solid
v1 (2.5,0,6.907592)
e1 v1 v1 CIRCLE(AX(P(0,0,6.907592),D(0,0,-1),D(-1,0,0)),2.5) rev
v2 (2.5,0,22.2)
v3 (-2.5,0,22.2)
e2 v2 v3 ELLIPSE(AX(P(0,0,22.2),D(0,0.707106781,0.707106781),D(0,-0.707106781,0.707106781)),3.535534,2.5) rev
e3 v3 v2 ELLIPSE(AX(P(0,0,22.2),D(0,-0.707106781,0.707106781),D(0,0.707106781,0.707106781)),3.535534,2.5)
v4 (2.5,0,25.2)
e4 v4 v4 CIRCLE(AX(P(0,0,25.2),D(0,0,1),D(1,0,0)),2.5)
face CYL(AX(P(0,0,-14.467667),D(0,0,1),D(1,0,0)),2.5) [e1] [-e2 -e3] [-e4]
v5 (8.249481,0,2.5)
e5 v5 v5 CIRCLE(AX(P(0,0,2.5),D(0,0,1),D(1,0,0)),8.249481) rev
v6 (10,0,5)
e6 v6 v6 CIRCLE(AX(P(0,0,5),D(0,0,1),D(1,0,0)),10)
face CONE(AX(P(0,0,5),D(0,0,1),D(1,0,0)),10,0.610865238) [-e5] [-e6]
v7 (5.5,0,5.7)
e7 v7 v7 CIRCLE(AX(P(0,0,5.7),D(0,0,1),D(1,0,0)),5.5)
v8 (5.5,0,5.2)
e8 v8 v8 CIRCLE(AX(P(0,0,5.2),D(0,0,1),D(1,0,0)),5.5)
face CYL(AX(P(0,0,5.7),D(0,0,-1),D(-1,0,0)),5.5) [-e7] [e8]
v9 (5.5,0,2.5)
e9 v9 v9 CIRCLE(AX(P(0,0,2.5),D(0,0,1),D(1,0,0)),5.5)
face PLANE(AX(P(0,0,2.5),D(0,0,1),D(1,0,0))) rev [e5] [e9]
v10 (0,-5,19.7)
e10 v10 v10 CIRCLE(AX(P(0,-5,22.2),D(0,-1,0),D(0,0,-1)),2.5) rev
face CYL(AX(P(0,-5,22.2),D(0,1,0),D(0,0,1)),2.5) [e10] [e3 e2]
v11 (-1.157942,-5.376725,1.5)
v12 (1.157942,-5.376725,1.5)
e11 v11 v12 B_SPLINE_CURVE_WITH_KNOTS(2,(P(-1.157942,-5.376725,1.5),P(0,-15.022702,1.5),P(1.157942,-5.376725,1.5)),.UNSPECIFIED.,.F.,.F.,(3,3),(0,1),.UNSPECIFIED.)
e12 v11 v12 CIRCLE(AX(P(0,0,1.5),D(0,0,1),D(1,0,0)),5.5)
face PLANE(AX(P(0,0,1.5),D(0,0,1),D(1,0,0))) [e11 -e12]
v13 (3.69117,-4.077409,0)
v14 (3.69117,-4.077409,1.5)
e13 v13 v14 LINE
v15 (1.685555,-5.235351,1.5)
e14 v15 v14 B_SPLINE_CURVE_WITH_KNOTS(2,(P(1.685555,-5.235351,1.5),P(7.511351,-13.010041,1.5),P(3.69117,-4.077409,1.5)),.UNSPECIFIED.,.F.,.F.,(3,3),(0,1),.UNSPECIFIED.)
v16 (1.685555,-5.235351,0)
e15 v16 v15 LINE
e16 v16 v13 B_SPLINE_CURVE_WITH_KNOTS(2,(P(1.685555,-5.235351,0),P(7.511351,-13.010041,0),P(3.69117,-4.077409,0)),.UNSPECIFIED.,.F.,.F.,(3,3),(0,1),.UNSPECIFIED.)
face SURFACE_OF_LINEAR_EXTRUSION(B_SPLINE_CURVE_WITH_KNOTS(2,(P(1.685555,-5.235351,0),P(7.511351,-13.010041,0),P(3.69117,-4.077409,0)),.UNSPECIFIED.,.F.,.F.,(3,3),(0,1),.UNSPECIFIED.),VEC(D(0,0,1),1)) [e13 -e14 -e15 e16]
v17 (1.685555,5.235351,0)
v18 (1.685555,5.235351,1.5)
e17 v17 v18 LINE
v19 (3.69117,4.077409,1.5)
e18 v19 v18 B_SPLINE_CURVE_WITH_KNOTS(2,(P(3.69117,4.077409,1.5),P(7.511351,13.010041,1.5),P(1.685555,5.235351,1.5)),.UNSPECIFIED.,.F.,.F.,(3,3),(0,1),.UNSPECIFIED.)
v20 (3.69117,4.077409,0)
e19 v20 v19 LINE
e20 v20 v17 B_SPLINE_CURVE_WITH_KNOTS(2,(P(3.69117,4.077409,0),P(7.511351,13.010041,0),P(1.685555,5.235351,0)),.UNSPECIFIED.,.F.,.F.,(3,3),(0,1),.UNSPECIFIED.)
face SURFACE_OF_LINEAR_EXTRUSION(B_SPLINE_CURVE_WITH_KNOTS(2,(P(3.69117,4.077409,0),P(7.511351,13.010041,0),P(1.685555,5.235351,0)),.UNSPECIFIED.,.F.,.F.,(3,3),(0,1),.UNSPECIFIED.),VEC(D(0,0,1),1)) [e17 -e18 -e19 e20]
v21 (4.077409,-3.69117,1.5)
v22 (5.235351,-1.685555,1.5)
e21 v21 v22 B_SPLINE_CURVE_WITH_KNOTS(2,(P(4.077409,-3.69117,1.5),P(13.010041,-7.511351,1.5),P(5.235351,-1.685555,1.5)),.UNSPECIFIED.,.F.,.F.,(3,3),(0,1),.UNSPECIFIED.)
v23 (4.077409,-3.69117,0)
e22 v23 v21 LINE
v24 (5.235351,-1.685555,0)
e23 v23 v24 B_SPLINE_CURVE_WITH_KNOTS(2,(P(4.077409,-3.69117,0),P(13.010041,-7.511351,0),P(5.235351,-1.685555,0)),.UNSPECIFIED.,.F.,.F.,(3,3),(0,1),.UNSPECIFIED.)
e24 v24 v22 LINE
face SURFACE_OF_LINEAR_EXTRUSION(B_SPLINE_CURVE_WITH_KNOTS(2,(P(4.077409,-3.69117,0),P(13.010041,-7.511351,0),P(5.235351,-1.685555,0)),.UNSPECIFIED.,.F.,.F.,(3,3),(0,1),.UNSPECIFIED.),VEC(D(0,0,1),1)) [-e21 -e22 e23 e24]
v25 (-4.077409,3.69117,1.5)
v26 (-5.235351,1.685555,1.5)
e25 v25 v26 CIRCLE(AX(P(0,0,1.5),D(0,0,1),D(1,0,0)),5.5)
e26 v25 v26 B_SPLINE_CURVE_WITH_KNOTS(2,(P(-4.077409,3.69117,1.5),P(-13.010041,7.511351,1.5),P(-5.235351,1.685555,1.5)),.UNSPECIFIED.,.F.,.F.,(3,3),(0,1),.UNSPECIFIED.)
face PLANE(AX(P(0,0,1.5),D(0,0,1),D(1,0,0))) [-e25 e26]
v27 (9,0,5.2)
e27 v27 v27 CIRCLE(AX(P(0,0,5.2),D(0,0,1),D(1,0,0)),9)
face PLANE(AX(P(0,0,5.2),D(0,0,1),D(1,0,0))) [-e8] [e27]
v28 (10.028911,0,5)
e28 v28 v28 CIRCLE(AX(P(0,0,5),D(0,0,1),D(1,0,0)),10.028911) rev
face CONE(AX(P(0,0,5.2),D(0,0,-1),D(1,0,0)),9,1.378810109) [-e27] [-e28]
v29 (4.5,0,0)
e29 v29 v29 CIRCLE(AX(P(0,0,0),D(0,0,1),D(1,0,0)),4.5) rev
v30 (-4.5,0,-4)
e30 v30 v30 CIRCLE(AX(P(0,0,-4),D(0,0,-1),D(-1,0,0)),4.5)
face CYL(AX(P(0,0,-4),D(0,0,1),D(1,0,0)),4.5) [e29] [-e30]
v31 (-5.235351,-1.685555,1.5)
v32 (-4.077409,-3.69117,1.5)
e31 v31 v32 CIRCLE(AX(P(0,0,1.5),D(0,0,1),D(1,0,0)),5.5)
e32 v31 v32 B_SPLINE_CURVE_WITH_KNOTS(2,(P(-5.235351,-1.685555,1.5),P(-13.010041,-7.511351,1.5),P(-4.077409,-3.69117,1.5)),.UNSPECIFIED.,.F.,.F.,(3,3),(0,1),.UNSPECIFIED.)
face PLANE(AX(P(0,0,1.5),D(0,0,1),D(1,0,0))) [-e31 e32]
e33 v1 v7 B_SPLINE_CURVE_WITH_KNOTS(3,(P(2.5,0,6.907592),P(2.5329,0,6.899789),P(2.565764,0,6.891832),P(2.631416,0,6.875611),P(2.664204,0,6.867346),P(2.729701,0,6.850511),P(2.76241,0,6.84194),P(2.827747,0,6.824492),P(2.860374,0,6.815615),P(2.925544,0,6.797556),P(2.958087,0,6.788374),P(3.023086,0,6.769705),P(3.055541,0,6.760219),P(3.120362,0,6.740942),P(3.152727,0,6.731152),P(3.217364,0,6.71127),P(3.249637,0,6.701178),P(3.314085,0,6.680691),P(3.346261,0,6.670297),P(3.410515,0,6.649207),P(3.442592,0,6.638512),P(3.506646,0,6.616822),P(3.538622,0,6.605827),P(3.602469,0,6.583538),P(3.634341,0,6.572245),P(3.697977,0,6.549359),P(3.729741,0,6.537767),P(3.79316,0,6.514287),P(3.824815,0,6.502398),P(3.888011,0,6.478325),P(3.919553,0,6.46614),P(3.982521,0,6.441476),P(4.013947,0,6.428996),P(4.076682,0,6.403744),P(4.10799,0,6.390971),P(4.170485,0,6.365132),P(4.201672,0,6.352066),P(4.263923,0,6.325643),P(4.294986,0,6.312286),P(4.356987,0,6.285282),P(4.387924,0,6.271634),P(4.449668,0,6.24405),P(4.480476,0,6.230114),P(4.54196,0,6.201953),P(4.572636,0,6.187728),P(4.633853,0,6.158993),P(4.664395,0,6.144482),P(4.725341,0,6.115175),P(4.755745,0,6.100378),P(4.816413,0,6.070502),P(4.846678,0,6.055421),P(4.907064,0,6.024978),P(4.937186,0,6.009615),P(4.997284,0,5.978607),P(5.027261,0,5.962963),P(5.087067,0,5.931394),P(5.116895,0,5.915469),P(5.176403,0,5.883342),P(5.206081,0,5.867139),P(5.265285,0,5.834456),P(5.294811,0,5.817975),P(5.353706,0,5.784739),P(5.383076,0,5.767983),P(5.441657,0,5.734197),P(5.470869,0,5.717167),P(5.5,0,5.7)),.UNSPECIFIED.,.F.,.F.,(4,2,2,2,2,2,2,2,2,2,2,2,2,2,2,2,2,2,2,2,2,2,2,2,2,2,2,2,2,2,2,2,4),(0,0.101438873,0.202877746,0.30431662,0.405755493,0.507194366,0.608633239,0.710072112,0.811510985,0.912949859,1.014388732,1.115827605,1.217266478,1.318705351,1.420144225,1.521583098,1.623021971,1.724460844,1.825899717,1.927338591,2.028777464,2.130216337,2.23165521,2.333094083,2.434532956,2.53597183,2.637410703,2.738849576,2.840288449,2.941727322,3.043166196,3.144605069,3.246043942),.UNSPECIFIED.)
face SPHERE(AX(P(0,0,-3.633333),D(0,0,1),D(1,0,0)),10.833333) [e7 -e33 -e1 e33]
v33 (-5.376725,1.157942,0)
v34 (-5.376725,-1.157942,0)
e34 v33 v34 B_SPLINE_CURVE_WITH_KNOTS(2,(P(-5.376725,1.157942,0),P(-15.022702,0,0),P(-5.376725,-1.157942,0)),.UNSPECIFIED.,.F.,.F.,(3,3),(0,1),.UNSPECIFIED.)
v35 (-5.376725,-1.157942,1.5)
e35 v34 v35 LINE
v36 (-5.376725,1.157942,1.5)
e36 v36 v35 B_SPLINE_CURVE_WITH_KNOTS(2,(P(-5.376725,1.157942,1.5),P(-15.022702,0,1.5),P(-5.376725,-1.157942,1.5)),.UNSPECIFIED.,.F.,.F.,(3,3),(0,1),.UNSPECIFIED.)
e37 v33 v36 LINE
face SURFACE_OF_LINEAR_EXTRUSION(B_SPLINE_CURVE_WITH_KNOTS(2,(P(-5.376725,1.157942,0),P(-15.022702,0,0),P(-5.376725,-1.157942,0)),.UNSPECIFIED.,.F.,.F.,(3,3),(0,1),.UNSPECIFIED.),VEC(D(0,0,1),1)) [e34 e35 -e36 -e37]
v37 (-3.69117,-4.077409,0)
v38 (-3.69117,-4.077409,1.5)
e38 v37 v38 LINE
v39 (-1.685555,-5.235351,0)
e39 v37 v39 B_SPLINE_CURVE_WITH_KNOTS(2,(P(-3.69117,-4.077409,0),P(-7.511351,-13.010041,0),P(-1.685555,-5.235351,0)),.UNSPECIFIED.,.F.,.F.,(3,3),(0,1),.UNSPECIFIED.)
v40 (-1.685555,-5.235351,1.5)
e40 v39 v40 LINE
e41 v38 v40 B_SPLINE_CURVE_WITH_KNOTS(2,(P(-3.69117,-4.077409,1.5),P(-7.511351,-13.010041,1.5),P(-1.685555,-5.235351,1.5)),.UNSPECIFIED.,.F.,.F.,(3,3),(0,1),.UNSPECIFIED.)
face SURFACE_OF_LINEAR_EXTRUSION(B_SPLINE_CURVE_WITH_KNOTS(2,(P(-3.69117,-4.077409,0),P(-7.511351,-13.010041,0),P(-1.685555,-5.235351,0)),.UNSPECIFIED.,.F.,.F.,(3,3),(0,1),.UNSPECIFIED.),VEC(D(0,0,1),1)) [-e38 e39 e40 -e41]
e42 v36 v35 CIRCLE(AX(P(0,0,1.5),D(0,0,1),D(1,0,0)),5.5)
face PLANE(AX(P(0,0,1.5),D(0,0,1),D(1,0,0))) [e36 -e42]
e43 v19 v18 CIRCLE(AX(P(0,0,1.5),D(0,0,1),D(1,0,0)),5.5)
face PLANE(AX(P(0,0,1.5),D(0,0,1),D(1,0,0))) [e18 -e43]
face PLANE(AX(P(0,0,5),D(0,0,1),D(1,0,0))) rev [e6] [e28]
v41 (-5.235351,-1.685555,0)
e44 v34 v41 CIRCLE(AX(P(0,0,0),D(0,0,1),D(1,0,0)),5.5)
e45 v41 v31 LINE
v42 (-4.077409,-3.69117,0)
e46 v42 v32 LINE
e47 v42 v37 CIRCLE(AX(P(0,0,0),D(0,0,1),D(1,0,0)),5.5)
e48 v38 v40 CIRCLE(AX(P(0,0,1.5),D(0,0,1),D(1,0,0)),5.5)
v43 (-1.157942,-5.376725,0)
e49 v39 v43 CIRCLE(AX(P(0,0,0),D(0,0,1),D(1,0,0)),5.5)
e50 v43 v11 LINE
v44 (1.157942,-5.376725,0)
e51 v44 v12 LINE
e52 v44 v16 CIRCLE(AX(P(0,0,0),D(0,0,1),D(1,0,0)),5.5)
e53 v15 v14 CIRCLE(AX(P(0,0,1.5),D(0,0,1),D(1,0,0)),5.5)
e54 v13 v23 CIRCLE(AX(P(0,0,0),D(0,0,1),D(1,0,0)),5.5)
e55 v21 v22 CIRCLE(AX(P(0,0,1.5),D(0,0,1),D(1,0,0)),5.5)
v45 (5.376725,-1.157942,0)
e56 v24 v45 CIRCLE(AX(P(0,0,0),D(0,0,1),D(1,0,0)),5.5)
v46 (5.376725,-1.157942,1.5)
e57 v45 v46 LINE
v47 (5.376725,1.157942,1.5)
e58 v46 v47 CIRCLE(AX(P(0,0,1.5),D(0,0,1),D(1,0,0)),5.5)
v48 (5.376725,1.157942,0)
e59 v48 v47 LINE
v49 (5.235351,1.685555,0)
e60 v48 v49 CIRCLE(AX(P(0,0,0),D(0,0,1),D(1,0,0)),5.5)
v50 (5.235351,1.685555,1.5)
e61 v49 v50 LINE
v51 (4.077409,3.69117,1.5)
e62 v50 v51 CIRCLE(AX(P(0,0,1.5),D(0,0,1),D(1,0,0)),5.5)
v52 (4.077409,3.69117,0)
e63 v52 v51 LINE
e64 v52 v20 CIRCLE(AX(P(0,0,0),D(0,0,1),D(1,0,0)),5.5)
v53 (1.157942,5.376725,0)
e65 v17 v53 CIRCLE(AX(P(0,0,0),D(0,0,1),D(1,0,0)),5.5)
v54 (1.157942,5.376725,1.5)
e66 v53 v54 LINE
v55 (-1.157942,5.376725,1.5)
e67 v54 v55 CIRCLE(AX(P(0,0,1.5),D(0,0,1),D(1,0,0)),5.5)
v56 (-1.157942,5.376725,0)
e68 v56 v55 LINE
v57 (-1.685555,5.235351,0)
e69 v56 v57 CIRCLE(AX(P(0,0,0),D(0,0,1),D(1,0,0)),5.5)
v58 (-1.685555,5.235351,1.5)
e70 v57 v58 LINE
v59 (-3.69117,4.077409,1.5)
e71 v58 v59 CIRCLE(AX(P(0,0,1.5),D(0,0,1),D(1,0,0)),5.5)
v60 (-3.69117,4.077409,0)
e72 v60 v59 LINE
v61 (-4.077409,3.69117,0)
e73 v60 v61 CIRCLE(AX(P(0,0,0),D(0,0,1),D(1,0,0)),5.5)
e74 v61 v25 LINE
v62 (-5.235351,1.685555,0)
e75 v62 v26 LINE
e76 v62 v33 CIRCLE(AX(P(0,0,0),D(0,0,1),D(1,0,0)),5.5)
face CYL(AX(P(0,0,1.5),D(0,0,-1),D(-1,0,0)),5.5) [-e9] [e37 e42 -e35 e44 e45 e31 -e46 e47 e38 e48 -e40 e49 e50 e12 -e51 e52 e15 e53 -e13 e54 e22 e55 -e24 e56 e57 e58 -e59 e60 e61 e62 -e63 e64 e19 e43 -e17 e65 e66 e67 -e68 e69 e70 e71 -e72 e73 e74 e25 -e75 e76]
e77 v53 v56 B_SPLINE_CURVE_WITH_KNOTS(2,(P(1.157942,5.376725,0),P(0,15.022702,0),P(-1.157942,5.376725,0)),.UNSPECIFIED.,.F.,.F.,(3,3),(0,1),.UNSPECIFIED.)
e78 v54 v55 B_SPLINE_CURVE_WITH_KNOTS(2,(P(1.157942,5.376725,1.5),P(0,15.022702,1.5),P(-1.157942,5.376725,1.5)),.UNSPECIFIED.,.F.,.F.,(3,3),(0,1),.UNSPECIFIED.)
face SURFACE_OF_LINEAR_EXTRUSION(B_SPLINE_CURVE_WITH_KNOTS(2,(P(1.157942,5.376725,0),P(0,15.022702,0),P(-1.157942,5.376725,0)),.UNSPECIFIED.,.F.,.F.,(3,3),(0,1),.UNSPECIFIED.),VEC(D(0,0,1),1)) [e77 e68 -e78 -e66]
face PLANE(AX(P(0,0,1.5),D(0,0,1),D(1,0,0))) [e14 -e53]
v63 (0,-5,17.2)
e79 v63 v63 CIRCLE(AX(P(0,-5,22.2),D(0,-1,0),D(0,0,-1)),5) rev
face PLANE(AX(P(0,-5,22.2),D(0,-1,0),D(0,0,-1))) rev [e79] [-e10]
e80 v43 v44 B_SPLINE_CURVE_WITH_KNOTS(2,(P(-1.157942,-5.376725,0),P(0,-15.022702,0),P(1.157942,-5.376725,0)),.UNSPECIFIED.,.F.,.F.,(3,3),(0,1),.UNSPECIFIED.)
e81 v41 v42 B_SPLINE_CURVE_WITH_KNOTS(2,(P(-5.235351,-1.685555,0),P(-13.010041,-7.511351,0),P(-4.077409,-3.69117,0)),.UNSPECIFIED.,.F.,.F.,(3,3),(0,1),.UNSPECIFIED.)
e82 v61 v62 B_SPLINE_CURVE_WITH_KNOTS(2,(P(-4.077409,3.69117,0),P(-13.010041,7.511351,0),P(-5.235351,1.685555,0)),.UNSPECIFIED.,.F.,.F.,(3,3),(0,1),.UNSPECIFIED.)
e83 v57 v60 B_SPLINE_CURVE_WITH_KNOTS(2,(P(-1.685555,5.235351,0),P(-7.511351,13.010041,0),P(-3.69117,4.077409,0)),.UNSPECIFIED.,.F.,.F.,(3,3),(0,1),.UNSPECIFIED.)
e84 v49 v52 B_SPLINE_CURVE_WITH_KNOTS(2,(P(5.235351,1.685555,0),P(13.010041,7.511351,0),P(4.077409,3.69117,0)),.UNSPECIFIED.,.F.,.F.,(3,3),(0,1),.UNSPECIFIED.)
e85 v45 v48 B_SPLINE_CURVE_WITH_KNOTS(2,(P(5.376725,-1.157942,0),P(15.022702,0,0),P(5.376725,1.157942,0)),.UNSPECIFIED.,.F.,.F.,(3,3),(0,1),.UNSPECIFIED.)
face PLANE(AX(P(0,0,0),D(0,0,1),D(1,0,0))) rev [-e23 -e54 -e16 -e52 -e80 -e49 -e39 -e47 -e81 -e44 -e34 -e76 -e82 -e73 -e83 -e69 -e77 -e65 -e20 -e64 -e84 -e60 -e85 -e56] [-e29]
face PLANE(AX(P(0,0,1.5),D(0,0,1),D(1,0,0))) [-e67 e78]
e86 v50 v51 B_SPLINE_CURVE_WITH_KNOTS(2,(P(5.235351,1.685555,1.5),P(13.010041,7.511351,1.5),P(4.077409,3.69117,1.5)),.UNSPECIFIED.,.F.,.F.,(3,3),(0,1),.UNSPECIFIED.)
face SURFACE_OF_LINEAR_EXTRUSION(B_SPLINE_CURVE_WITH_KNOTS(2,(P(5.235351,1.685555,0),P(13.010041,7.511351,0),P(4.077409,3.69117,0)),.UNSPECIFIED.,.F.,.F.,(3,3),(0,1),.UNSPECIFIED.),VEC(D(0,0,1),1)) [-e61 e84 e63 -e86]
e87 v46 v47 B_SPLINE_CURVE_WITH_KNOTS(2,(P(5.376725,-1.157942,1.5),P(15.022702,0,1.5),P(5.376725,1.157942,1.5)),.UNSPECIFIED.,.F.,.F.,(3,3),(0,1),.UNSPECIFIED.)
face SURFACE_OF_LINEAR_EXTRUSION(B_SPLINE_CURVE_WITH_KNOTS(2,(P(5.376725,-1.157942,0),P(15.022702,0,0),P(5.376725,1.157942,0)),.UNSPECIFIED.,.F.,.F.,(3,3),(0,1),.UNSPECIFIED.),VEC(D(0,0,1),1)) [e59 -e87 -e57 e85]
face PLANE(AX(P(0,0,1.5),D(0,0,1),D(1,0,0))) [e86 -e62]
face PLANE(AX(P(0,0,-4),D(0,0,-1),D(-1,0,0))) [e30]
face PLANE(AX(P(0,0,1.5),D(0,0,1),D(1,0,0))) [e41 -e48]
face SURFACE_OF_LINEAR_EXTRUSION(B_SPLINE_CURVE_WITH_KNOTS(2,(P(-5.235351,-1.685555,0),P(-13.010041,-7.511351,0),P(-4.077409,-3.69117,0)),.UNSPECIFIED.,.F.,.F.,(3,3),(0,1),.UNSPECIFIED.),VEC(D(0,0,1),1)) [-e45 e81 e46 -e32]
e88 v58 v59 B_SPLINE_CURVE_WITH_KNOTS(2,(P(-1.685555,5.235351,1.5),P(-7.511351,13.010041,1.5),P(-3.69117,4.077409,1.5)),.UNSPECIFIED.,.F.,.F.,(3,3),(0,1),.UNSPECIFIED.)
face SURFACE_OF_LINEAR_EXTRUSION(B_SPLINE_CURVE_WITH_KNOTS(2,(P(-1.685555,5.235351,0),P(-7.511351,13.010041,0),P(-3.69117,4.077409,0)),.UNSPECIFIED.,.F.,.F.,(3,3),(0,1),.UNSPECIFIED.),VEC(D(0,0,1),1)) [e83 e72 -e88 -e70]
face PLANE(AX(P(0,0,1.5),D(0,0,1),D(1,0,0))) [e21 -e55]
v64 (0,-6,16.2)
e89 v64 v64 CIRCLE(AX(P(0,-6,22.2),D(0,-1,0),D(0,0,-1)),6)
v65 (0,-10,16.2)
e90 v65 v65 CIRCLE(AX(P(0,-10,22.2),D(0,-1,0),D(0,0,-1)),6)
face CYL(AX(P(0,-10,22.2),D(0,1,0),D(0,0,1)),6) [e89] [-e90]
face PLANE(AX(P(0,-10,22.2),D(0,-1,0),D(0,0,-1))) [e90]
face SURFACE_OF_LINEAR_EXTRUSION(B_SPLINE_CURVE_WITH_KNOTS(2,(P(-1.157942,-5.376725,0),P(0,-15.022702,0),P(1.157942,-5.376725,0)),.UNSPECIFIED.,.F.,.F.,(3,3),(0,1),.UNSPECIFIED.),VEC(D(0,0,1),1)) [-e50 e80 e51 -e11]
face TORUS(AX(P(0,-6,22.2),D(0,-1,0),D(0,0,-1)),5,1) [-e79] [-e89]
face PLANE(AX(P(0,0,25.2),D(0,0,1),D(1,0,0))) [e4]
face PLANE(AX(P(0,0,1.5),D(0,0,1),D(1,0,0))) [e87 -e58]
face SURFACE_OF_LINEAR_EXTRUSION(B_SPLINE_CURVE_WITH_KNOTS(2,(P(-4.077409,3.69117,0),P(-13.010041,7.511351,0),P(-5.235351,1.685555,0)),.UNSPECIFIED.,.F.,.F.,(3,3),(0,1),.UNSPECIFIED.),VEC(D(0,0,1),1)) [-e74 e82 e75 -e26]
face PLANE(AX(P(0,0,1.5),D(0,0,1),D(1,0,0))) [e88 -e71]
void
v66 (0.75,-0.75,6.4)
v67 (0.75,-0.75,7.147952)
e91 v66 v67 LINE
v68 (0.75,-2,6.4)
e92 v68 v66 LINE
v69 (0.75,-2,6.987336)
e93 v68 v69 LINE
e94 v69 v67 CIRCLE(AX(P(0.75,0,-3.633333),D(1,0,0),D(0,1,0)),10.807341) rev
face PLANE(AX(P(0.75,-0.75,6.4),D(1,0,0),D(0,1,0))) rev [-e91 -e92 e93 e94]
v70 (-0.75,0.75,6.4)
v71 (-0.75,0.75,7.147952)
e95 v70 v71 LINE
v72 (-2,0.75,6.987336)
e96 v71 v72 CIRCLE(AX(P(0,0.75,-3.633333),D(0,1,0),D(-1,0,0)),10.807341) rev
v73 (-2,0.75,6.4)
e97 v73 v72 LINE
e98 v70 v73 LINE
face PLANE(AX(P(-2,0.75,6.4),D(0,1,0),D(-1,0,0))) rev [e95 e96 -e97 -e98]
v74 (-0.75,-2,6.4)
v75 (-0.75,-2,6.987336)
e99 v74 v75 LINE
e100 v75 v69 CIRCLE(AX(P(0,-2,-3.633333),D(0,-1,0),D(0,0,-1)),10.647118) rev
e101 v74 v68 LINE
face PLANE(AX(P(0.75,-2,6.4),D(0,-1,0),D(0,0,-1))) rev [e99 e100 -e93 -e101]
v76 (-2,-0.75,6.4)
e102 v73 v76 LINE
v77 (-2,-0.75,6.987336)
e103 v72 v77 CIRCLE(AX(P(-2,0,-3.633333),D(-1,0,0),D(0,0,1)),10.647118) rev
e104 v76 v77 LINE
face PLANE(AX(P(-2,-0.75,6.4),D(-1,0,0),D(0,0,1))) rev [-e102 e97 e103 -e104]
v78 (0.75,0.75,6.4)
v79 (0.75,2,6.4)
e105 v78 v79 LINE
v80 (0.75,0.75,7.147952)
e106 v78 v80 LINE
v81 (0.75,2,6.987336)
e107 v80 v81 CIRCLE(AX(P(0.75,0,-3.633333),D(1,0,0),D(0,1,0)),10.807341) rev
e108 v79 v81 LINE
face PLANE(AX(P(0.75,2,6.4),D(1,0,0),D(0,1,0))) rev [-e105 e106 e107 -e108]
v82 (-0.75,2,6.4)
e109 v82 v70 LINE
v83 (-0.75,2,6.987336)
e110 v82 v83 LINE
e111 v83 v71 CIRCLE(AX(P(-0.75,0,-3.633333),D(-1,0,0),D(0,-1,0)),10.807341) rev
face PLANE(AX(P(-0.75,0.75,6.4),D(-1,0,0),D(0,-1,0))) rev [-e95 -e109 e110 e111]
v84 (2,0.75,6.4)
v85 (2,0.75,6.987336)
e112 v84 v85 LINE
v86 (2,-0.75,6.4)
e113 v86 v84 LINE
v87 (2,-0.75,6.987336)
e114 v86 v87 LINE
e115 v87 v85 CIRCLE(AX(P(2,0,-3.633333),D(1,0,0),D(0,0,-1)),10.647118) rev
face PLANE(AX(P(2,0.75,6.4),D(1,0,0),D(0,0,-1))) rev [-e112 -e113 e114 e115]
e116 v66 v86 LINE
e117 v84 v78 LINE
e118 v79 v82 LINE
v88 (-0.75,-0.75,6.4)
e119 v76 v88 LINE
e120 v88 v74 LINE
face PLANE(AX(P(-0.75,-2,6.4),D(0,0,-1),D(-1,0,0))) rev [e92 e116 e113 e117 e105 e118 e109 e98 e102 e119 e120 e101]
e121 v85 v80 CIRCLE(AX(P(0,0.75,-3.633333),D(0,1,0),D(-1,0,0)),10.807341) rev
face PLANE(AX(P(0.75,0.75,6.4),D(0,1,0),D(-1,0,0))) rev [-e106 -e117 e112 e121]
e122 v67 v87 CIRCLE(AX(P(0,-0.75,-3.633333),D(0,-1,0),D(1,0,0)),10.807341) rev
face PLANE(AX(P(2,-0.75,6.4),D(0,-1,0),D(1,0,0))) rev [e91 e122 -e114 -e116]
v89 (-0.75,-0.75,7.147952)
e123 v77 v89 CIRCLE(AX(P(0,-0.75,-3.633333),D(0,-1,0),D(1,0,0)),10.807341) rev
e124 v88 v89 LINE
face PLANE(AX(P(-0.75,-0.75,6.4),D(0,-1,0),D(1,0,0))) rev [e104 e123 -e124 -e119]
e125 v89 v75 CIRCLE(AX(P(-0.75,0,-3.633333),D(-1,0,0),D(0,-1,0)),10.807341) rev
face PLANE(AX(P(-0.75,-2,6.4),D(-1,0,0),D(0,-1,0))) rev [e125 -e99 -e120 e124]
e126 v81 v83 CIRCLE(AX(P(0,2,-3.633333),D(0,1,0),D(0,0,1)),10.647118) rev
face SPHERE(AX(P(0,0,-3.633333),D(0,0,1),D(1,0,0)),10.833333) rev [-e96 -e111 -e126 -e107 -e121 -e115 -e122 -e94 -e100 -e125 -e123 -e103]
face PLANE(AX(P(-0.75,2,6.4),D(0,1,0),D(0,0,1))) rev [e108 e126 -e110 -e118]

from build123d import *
from build123d.topology import SkipClean

# Parameters (mm, degrees)
SKETCH1_R                = 5.5
GEARPLATE_DEPTH          = 1.5
BOSS_EXTRUDE3_DEPTH      = 1.5
CIRPATTERN2_COUNT        = 12
SKETCH3_R                = 4.5
BACKPLATE_DEPTH          = 4
SKETCH4_R                = 5.5
PLATE_DEPTH              = 1
SKETCH6_R                = 10
ANGLEPLATE_DEPTH         = 2.5
ANGLEPLATE_DRAFT         = -35
SKETCH8_R                = 9
SMALLANGLEPLATE_DEPTH    = 0.2
SMALLANGLEPLATE_DRAFT    = 79
SKETCH9_R                = 5.5
DOMEEXTRUDE_DEPTH        = 0.5
CUT_EXTRUDE1_DEPTH       = 3.8
BOSS_EXTRUDE5_REACH      = 34.569
BOSS_EXTRUDE5_END_RADIUS = 10.833333333
SKETCH12_R               = 2.5
SKETCH15_R               = 2.5
BOSS_EXTRUDE6_DEPTH      = 5
SKETCH16_R               = 6
BOSS_EXTRUDE7_DEPTH      = 5
FILLET1_R                = 1


# Read off the part's stored shape, not the designer's step: Dome1
with BuildPart() as part:
    # Sketch1 → GearPlate (new body)
    with BuildSketch(Plane.XY):
        Circle(SKETCH1_R)
    extrude(amount=GEARPLATE_DEPTH)

    # Sketch2 → Boss-Extrude3 (add)
    with BuildSketch(Plane.XY.offset(1.5)):
        with BuildLine():
            Line((-1.157942076, 5.376724853), (1.157942076, 5.376724853))
            add(Edge.make_bspline(
                [(-1.157942076, 5.376724853), (0, 15.022701543), (1.157942076, 5.376724853)],
                knots=[0, 0, 0, 1, 1, 1], degree=2))
        make_face()
    boss_extrude3 = extrude(amount=-BOSS_EXTRUDE3_DEPTH)

    # CirPattern2: Boss-Extrude3 ×12 about axis
    cirpattern2_axis = Axis((0, 0, 1.5), (0, 0, -1))
    for i in range(1, CIRPATTERN2_COUNT):
        add(boss_extrude3.rotate(cirpattern2_axis, i * 360 / CIRPATTERN2_COUNT))

    # Sketch3 → BackPlate (add)
    with BuildSketch(Plane(origin=(0, 0, 0), x_dir=(-1, 0, 0), z_dir=(0, 0, -1))):
        with Locations(Location((0, 0, 0), (0, 0, 180))):
            Circle(SKETCH3_R)
    extrude(amount=BACKPLATE_DEPTH)

    # Sketch4 → Plate (add)
    with BuildSketch(Plane.XY.offset(1.5)):
        with Locations(Location((0, 0, 0), (0, 0, 192.153701922))):
            Circle(SKETCH4_R)
    extrude(amount=PLATE_DEPTH)


with BuildPart() as angleplate_tool:
    # Sketch6 → AnglePlate (with draft: the straight prism first)
    with BuildSketch(Plane.XY.offset(5)):
        Circle(SKETCH6_R)
    extrude(amount=-ANGLEPLATE_DEPTH)
    # AnglePlate: the draft: its side faces are tilted about the plane it starts from
    angleplate_sides = [angleplate_tool.faces().sort_by_distance(p)[0] for p in [
        (-10, 0, 3.75),
    ]]
    draft(angleplate_sides, Plane.XY.offset(5), ANGLEPLATE_DRAFT)


with BuildPart() as part_1:
    add(part.part)

    # AnglePlate: add angleplate_tool
    add(angleplate_tool.part)


with BuildPart() as smallangleplate_tool:
    # Sketch8 → SmallAnglePlate (with draft: the straight prism first)
    with BuildSketch(Plane.XY.offset(5.2)):
        Circle(SKETCH8_R)
    extrude(amount=-SMALLANGLEPLATE_DEPTH)
    # SmallAnglePlate: the draft: its side faces are tilted about the plane it starts from
    smallangleplate_sides = [smallangleplate_tool.faces().sort_by_distance(p)[0] for p in [
        (-9, 0, 5.1),
    ]]
    draft(smallangleplate_sides, Plane.XY.offset(5.2), SMALLANGLEPLATE_DRAFT)


with BuildPart() as part_2:
    add(part_1.part)

    # SmallAnglePlate: add smallangleplate_tool
    add(smallangleplate_tool.part)

    # Sketch9 → DomeExtrude (add)
    with SkipClean():  # the faces are left unmerged after this step: merging them gives an invalid solid
        with BuildSketch(Plane.XY.offset(5.2)):
            with Locations(Location((0, 0, 0), (0, 0, 192.153701922))):
                Circle(SKETCH9_R)
        extrude(amount=DOMEEXTRUDE_DEPTH)

    # Dome1 outline → Dome1 (revolve)
    with SkipClean():  # the faces are left unmerged after this step: merging them gives an invalid solid
        with BuildSketch(Plane.XZ):
            with BuildLine():
                Line((0, 5.7), (5.500000009, 5.699999994))
                ThreePointArc((5.500000009, 5.699999994), (2.850438568, 6.818274729), (0, 7.2))
                Line((0, 7.2), (0, 5.7))
            make_face()
        revolve(axis=Axis((0, 0, 0), (0, 0, 1)))

    # Sketch11 → Cut-Extrude1 (cut)
    with SkipClean():  # the faces are left unmerged after this step: merging them gives an invalid solid
        with BuildSketch(Plane.XY.offset(10.2)):
            Polygon((-0.75, 2), (0.75, 2), (0.75, 0.75), (2, 0.75), (2, -0.75), (0.75, -0.75), (0.75, -2), (-0.75, -2), (-0.75, -0.75), (-2, -0.75), (-2, 0.75), (-0.75, 0.75), align=None)
        extrude(amount=-CUT_EXTRUDE1_DEPTH, mode=Mode.SUBTRACT)

    # Boss-Extrude5: up to this sphere (the profile starts outside it)
    with SkipClean():  # the faces are left unmerged after this step: merging them gives an invalid solid
        boss_extrude5_end = Location((0, 0, -3.633333333)) * Sphere(BOSS_EXTRUDE5_END_RADIUS, mode=Mode.PRIVATE)
        # Sketch12 → Boss-Extrude5 (add, up to the surface)
        with BuildSketch(Plane.XY.offset(25.2), mode=Mode.PRIVATE) as boss_extrude5_sk1:
            Circle(SKETCH12_R)
        boss_extrude5_tool1 = extrude(boss_extrude5_sk1.sketch, amount=-BOSS_EXTRUDE5_REACH, mode=Mode.PRIVATE) - boss_extrude5_end
        add(boss_extrude5_tool1.solids().sort_by_distance((0, 0, 25.2))[0])

    # Sketch15 → Boss-Extrude6 (add)
    with SkipClean():  # the faces are left unmerged after this step: merging them gives an invalid solid
        with BuildSketch(Plane(origin=(0, 0, 0), x_dir=(1, 0, 0), z_dir=(0, 1, 0))):
            with Locations(Location((0, -22.2, 0), (0, 0, 270))):
                Circle(SKETCH15_R)
        extrude(amount=-BOSS_EXTRUDE6_DEPTH)

    # Sketch16 → Boss-Extrude7 (add)
    with SkipClean():  # the faces are left unmerged after this step: merging them gives an invalid solid
        with BuildSketch(Plane.XZ.offset(5)):
            with Locations(Location((0, 22.2, 0), (0, 0, 270))):
                Circle(SKETCH16_R)
        extrude(amount=BOSS_EXTRUDE7_DEPTH)

    # Fillet1
    fillet1_edges = [part_2.edges().sort_by_distance(p)[0] for p in [
        (0, -5, 28.2),
    ]]
    fillet(fillet1_edges, radius=FILLET1_R)


solid = part_2.part
